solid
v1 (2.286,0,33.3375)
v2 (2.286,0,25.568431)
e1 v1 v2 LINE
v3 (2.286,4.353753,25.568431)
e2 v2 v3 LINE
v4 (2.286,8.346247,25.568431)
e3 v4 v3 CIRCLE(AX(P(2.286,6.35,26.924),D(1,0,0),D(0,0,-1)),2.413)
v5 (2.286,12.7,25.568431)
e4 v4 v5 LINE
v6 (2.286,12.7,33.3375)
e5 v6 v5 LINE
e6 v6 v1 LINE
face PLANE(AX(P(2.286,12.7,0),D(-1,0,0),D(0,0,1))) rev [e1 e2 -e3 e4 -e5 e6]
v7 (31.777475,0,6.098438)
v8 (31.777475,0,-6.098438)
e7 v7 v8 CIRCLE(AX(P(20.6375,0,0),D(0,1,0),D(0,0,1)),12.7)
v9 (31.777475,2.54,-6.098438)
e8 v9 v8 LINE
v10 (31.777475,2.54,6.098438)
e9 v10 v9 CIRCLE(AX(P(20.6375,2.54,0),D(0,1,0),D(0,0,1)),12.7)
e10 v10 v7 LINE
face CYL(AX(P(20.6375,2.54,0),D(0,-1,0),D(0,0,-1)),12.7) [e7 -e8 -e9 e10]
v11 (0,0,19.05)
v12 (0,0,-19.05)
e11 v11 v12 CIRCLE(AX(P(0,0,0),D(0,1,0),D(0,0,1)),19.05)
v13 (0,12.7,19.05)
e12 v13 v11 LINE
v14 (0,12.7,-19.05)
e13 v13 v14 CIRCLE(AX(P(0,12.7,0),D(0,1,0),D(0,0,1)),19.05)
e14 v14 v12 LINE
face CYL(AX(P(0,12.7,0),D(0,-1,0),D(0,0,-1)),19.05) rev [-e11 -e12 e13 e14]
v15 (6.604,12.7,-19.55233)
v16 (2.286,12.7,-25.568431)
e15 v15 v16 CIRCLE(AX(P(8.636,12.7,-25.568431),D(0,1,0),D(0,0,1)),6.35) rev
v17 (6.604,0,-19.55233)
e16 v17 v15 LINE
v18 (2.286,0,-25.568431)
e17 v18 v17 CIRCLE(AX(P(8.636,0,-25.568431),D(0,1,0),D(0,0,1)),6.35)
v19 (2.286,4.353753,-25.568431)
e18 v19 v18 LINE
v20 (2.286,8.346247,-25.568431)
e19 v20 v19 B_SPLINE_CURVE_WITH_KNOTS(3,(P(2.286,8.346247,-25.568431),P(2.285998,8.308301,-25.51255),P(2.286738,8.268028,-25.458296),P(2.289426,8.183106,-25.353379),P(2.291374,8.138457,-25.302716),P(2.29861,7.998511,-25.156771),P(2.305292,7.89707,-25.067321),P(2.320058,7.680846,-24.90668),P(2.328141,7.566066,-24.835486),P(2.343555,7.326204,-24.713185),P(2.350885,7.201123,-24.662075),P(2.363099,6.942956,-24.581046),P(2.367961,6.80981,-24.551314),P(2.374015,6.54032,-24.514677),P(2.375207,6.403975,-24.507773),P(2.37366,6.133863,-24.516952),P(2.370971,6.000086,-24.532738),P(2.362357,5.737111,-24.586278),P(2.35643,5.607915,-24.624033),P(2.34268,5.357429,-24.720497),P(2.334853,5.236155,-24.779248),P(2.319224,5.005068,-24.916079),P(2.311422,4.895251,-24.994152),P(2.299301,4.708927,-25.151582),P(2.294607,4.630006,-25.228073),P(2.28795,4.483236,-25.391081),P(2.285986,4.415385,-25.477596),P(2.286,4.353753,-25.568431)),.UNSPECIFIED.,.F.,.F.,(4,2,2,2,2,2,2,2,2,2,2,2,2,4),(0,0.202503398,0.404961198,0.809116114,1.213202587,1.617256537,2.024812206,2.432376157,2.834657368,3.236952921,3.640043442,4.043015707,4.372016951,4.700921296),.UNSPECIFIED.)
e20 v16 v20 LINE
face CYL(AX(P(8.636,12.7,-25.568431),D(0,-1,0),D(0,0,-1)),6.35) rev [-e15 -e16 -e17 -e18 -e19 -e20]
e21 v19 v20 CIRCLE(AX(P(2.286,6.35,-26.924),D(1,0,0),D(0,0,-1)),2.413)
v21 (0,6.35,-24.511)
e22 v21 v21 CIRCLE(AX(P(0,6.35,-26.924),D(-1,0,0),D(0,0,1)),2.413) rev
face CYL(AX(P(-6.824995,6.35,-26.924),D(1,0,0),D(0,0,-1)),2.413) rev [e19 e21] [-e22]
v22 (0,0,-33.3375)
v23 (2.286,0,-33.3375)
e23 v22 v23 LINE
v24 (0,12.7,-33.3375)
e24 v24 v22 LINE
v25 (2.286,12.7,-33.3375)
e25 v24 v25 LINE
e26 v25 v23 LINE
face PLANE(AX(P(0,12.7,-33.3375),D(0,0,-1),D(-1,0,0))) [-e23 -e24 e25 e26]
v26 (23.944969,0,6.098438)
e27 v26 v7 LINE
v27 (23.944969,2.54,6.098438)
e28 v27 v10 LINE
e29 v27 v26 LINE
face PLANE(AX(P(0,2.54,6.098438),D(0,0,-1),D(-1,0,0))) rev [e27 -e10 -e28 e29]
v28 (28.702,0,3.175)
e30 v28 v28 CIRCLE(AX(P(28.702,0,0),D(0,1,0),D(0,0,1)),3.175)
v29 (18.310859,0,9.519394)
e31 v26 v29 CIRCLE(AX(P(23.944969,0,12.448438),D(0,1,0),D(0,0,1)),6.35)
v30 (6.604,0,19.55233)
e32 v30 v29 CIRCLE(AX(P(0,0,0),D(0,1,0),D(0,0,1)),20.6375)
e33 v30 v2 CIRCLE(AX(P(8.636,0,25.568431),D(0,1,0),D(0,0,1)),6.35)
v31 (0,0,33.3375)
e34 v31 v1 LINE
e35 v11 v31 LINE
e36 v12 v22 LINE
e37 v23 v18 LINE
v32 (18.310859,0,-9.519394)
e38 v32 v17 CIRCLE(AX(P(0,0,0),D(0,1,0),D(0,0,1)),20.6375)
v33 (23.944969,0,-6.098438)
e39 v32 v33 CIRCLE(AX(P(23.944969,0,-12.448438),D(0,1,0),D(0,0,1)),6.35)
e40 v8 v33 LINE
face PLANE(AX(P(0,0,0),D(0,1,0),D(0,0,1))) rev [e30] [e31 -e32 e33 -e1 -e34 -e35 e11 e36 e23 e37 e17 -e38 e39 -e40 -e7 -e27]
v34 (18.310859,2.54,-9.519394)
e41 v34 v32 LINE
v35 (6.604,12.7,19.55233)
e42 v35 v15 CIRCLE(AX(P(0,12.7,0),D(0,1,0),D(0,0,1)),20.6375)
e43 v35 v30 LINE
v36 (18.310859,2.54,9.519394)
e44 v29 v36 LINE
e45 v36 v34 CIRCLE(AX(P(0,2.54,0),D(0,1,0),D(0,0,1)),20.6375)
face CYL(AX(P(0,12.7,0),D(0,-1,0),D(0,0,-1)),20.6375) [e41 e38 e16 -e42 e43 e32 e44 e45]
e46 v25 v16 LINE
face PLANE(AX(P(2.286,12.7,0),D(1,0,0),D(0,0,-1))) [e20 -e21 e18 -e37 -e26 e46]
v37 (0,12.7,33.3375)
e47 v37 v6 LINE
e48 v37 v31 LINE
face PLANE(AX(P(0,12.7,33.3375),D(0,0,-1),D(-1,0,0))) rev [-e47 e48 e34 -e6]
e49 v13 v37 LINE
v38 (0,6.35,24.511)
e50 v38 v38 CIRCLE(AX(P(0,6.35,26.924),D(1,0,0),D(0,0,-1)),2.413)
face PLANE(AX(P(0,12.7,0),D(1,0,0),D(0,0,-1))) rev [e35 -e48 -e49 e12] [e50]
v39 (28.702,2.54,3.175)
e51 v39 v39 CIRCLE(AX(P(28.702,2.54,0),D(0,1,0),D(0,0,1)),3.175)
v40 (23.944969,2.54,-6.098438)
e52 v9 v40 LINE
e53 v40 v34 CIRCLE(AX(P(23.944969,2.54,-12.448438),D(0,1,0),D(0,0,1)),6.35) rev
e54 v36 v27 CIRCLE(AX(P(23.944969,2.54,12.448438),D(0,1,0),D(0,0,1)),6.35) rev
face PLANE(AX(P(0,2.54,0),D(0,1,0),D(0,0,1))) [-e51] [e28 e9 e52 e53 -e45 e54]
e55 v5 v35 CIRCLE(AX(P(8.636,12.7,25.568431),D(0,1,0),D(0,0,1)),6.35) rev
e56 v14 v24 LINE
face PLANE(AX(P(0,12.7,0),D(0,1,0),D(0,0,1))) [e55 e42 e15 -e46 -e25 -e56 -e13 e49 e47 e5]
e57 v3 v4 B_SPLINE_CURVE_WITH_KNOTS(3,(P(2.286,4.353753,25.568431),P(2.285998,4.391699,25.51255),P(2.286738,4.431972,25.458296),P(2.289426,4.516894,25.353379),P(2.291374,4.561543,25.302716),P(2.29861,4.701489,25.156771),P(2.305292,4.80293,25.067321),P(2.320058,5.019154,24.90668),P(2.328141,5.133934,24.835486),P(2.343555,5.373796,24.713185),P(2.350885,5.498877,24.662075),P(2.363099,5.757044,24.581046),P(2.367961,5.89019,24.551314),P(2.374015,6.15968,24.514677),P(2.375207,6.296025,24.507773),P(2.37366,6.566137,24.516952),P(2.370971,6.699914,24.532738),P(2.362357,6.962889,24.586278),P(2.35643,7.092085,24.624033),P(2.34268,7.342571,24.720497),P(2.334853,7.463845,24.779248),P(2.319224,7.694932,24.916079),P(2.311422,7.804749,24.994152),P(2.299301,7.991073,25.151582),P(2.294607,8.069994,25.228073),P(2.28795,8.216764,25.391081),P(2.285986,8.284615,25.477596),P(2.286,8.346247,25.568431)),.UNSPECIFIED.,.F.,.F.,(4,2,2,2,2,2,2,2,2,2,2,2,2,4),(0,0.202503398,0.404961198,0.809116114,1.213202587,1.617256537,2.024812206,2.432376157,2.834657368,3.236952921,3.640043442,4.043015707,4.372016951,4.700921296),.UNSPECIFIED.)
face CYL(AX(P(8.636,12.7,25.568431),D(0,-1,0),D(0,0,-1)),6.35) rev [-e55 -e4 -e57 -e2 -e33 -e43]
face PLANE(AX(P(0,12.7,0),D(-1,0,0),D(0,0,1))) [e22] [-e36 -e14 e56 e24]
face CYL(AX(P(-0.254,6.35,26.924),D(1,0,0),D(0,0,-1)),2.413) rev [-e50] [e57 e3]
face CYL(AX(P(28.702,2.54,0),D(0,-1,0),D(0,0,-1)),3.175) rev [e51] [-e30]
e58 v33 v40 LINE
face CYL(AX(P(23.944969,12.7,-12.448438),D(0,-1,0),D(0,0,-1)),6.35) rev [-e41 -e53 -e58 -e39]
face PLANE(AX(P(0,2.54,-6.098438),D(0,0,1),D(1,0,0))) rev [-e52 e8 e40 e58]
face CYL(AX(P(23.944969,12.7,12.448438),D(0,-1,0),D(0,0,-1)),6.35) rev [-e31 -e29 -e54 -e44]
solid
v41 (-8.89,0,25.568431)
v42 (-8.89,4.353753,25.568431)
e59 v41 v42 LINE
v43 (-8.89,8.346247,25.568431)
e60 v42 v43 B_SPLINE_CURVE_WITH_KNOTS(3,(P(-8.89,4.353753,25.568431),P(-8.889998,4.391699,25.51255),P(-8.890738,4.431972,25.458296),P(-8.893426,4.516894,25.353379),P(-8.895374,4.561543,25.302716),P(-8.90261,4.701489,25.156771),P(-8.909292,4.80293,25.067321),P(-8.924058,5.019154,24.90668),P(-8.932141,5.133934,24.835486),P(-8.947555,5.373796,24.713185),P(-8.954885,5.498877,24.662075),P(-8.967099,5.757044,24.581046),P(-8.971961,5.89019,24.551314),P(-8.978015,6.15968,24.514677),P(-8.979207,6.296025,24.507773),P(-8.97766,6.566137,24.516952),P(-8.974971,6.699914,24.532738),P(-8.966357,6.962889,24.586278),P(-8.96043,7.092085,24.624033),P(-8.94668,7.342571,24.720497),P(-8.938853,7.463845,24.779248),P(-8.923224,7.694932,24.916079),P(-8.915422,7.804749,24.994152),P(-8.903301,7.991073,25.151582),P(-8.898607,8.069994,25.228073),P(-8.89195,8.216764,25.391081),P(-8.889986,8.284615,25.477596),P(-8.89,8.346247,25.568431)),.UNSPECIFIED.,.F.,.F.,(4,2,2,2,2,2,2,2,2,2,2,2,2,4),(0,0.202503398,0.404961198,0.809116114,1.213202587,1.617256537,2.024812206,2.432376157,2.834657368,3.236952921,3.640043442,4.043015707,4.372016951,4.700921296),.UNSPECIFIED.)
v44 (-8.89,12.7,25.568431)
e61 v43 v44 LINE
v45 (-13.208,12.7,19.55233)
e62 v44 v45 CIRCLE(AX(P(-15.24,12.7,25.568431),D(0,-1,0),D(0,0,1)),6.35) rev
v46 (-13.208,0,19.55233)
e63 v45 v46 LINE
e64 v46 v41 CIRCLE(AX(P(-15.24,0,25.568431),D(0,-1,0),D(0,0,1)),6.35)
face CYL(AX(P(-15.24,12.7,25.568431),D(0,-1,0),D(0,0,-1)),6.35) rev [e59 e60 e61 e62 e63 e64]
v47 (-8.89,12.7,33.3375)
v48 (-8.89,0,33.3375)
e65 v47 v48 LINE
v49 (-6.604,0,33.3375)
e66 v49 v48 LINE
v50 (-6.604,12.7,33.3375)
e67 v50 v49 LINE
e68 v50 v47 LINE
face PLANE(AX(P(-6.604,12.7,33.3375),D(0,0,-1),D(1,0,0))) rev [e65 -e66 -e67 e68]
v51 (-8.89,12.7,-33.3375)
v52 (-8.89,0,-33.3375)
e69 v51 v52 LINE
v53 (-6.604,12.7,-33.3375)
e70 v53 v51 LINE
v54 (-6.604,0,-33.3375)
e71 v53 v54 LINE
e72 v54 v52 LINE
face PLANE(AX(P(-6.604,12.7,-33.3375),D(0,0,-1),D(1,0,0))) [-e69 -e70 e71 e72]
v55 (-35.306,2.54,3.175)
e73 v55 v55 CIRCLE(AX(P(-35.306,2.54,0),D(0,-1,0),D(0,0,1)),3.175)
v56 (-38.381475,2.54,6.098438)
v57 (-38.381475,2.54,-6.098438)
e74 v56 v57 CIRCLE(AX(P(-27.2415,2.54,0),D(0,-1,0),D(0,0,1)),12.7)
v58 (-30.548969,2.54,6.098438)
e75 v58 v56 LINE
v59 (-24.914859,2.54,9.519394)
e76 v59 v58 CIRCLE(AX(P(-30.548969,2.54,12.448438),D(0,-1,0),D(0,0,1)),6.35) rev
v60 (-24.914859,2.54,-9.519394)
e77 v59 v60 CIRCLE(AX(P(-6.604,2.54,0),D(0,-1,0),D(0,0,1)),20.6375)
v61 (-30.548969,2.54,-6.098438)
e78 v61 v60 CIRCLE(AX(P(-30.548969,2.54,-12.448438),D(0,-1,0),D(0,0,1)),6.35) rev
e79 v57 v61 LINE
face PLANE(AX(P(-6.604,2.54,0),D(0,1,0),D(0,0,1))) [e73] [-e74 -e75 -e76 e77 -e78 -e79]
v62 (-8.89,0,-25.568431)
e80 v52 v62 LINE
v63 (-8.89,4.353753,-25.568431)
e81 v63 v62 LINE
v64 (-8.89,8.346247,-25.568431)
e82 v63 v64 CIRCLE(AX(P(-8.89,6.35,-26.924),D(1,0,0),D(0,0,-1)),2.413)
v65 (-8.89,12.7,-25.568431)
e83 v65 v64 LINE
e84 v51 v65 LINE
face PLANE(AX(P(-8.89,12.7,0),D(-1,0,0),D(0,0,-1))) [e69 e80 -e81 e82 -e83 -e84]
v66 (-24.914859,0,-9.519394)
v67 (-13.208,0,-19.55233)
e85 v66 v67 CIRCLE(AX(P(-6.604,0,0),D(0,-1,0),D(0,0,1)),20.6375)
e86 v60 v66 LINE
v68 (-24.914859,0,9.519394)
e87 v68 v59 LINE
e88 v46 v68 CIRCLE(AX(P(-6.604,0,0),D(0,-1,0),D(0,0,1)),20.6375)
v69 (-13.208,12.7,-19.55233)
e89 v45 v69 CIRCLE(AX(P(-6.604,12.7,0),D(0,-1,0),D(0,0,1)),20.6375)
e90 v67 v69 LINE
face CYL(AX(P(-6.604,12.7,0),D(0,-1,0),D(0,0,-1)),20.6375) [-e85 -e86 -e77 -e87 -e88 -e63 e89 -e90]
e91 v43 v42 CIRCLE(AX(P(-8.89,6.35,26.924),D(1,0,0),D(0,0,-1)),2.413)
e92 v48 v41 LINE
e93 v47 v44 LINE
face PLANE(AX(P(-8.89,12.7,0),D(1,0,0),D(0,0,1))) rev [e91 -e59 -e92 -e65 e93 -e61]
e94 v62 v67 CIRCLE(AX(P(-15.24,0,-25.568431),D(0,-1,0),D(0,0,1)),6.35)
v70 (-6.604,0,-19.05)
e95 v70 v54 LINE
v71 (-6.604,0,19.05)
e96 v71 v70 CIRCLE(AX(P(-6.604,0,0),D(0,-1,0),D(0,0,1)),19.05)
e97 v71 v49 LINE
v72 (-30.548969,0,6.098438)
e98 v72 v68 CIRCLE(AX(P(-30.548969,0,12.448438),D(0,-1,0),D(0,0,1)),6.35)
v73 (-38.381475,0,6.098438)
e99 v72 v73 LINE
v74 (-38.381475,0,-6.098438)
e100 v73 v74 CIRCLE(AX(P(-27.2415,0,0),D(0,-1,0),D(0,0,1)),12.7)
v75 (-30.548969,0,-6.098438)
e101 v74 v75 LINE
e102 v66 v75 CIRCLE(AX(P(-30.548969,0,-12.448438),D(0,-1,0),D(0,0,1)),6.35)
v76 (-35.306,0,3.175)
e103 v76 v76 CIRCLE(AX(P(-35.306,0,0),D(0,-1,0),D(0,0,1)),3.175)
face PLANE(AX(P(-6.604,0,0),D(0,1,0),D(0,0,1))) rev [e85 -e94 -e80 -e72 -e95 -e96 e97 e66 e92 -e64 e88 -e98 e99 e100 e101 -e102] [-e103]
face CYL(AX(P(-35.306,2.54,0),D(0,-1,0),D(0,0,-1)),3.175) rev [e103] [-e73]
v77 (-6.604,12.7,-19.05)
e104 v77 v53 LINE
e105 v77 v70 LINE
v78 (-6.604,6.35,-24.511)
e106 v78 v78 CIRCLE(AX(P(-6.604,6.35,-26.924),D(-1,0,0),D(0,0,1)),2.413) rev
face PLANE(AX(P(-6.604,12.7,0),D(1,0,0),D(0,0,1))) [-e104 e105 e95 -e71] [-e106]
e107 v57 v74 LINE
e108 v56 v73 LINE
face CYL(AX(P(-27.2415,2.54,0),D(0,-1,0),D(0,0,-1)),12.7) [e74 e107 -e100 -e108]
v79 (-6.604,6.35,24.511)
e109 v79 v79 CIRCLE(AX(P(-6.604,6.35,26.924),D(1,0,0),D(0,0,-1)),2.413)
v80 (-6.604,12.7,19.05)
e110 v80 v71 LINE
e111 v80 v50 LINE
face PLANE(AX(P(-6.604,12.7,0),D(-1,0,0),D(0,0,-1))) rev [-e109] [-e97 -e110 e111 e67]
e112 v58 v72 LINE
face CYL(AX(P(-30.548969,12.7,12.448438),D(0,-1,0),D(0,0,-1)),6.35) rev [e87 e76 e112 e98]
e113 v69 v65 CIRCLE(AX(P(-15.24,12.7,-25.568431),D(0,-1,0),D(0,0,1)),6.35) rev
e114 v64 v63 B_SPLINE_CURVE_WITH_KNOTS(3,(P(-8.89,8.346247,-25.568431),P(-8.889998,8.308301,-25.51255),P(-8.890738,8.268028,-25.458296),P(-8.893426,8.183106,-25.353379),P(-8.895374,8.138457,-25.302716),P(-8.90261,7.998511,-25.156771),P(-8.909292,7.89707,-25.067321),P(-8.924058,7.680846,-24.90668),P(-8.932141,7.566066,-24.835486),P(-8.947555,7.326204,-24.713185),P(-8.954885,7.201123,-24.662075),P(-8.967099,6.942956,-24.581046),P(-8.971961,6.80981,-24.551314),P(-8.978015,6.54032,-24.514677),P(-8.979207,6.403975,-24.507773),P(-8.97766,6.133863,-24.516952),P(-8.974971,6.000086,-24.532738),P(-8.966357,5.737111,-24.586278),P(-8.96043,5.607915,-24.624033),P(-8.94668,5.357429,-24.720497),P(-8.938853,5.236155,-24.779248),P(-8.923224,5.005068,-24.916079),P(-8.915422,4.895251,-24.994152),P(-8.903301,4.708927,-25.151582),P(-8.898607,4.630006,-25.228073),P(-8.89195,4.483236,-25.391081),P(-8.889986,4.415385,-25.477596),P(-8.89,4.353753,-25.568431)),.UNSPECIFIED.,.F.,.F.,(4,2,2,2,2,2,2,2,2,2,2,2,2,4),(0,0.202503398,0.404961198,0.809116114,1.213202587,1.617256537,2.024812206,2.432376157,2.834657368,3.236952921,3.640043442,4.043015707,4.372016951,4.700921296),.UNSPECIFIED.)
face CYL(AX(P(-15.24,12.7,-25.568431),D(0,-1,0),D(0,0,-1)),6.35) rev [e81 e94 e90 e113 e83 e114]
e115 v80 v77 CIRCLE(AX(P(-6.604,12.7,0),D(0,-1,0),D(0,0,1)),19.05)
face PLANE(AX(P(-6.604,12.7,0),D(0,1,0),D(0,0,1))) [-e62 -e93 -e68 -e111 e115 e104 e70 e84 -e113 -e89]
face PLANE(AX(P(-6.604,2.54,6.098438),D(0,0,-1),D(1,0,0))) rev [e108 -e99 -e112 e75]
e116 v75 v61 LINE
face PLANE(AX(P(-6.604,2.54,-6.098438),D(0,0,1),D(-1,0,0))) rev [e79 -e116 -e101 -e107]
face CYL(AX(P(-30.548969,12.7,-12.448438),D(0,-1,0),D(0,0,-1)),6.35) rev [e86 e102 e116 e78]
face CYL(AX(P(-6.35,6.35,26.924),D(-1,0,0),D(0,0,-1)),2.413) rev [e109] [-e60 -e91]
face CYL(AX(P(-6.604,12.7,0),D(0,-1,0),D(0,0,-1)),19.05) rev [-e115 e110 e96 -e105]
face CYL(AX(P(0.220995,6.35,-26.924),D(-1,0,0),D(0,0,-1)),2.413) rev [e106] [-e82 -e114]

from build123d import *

# Parameters (mm, degrees)
BOSS_EXTRUDE1_DEPTH = 12.7
SKETCH1_4_R         = 3.175
BOSS_EXTRUDE2_DEPTH = 2.54
SKETCH4_R           = 2.413
CUT_EXTRUDE1_DEPTH  = 2.286
SKETCH4_3_R         = 2.413
CUT_EXTRUDE2_DEPTH  = 2.54
FILLET1_R           = 6.35


with BuildPart() as part:
    # Sketch1 → Boss-Extrude1 (new body)
    with BuildSketch(Plane(origin=(0, 0, 0), x_dir=(1, 0, 0), z_dir=(0, 1, 0))):
        with BuildLine():
            Line((0, 33.3375), (0, 20.6375))
            ThreePointArc((0, 20.6375), (1.14476253, 20.605725539), (2.286, 20.5105))
            Line((2.286, 20.5105), (2.286, 33.3375))
            Line((2.286, 33.3375), (0, 33.3375))
        make_face()
        with BuildLine():
            Line((0, 20.6375), (0, 19.05))
            ThreePointArc((0, 19.05), (19.05, 0), (0, -19.05))
            Line((0, -19.05), (0, -20.6375))
            ThreePointArc((0, -20.6375), (1.14476253, -20.605725539), (2.286, -20.5105))
            ThreePointArc((2.286, -20.5105), (13.150947863, -15.904684107), (19.715868102, -6.098438425))
            ThreePointArc((19.715868102, -6.098438425), (20.6375, 0), (19.715868102, 6.098438425))
            ThreePointArc((19.715868102, 6.098438425), (13.150947863, 15.904684107), (2.286, 20.5105))
            ThreePointArc((2.286, 20.5105), (1.14476253, 20.605725539), (0, 20.6375))
        make_face()
        with BuildLine():
            ThreePointArc((2.286, -20.5105), (1.14476253, -20.605725539), (0, -20.6375))
            Line((0, -20.6375), (0, -33.3375))
            Line((0, -33.3375), (2.286, -33.3375))
            Line((2.286, -33.3375), (2.286, -20.5105))
        make_face()
    extrude(amount=BOSS_EXTRUDE1_DEPTH)

    # Sketch1<4> → Boss-Extrude2 (add)
    with BuildSketch(Plane(origin=(0, 0, 0), x_dir=(1, 0, 0), z_dir=(0, 1, 0))):
        with BuildLine():
            Line((31.777475259, 6.098438425), (19.715868102, 6.098438425))
            ThreePointArc((19.715868102, 6.098438425), (20.6375, 0), (19.715868102, -6.098438425))
            Line((19.715868102, -6.098438425), (31.777475259, -6.098438425))
            ThreePointArc((31.777475259, -6.098438425), (33.3375, 0), (31.777475259, 6.098438425))
        make_face()
        with Locations(Location((28.702, 0, 0), (0, 0, 270))):
            Circle(SKETCH1_4_R, mode=Mode.SUBTRACT)
    extrude(amount=BOSS_EXTRUDE2_DEPTH)

    # Sketch4 → Cut-Extrude1 (cut)
    with BuildSketch(Plane(origin=(2.286, 0, 0), x_dir=(0, 0, -1), z_dir=(1, 0, 0))):
        with Locations((26.924, 6.35)):
            Circle(SKETCH4_R)
    extrude(amount=-CUT_EXTRUDE1_DEPTH, mode=Mode.SUBTRACT)

    # Sketch4<3> → Cut-Extrude2 (cut)
    with BuildSketch(Plane(origin=(2.286, 0, 0), x_dir=(0, 0, -1), z_dir=(1, 0, 0))):
        with Locations((26.924, 6.35)):
            Circle(SKETCH4_3_R)
        with Locations((-26.924, 6.35)):
            Circle(SKETCH4_3_R)
    extrude(amount=-CUT_EXTRUDE2_DEPTH, mode=Mode.SUBTRACT)

    # Fillet1
    # the kernel refuses this fillet: 6.35 mm, written as the material it adds along each edge
    with BuildSketch(Plane(origin=(2.286, 0, -20.5105), x_dir=(0, 0, -1), z_dir=(0, 1, 0))) as fillet1_piece_1_section:
        with BuildLine():
            CenterArc((5.057930931, -6.35), FILLET1_R, 90, 71.337075115)
            ThreePointArc((-0.958170465, -4.318), (-0.363071911, -2.184743524), (0, 0))
            Line((0, 0), (5.057930931, 0))
        make_face()
    fillet1_piece_1 = extrude(amount=12.7, mode=Mode.PRIVATE)
    fillet1_piece_1 = fillet1_piece_1 - Plane(origin=(3.246352343, 6.35, -26.924), x_dir=(0, 0, -1), z_dir=(1, 0, 0)) * Cylinder(2.413, 46, mode=Mode.PRIVATE)
    add(fillet1_piece_1)
    with BuildSketch(Plane(origin=(2.286, 0, 20.5105), x_dir=(0.9762533295562881, 0, -0.21663203025005656), z_dir=(0, 1, 0))) as fillet1_piece_2_section:
        with BuildLine():
            CenterArc((5.103498796, -6.313435304), FILLET1_R, 96.151632323, 71.337075115)
            Line((-1.095709846, -4.937821912), (0, 0))
            ThreePointArc((0, 0), (2.211516145, -0.118835263), (4.42303229, 0))
        make_face()
    fillet1_piece_2 = extrude(amount=12.7, mode=Mode.PRIVATE)
    fillet1_piece_2 = fillet1_piece_2 - Plane(origin=(3.246352283, 6.35, 26.924), x_dir=(0, 0, -1), z_dir=(1, 0, 0)) * Cylinder(2.413, 46, mode=Mode.PRIVATE)
    add(fillet1_piece_2)
    with BuildSketch(Plane(origin=(19.715868102, 0, 6.098438425), x_dir=(-0.3799128723665478, 0, 0.9250222750886592), z_dir=(0, 1, 0))) as fillet1_piece_3:
        with BuildLine():
            CenterArc((4.267201604, 6.324459208), FILLET1_R, 202.328285877, 62.531116376)
            Line((-1.606689843, 3.912012469), (0, 0))
            ThreePointArc((0, 0), (1.849120695, 0.083007574), (3.69824139, 0))
        make_face()
    extrude(amount=2.54)
    with BuildSketch(Plane(origin=(19.715868102, 0, -6.098438425), x_dir=(-0.37991287236654947, 0, -0.9250222750886584), z_dir=(0, 1, 0))) as fillet1_piece_4:
        with BuildLine():
            CenterArc((4.267201604, -6.324459208), FILLET1_R, 95.140597747, 62.531116376)
            Line((-1.606689843, -3.912012469), (0, 0))
            ThreePointArc((0, 0), (1.849120695, -0.083007574), (3.69824139, 0))
        make_face()
    extrude(amount=2.54)


with BuildPart() as body_2:
    # Mirror4: mirrored copy
    add(part.part.mirror(Plane(origin=(-3.302, 0, 0), x_dir=(0, 0, 1), z_dir=(1, 0, 0))))


solid = Compound([part.part, body_2.part])
